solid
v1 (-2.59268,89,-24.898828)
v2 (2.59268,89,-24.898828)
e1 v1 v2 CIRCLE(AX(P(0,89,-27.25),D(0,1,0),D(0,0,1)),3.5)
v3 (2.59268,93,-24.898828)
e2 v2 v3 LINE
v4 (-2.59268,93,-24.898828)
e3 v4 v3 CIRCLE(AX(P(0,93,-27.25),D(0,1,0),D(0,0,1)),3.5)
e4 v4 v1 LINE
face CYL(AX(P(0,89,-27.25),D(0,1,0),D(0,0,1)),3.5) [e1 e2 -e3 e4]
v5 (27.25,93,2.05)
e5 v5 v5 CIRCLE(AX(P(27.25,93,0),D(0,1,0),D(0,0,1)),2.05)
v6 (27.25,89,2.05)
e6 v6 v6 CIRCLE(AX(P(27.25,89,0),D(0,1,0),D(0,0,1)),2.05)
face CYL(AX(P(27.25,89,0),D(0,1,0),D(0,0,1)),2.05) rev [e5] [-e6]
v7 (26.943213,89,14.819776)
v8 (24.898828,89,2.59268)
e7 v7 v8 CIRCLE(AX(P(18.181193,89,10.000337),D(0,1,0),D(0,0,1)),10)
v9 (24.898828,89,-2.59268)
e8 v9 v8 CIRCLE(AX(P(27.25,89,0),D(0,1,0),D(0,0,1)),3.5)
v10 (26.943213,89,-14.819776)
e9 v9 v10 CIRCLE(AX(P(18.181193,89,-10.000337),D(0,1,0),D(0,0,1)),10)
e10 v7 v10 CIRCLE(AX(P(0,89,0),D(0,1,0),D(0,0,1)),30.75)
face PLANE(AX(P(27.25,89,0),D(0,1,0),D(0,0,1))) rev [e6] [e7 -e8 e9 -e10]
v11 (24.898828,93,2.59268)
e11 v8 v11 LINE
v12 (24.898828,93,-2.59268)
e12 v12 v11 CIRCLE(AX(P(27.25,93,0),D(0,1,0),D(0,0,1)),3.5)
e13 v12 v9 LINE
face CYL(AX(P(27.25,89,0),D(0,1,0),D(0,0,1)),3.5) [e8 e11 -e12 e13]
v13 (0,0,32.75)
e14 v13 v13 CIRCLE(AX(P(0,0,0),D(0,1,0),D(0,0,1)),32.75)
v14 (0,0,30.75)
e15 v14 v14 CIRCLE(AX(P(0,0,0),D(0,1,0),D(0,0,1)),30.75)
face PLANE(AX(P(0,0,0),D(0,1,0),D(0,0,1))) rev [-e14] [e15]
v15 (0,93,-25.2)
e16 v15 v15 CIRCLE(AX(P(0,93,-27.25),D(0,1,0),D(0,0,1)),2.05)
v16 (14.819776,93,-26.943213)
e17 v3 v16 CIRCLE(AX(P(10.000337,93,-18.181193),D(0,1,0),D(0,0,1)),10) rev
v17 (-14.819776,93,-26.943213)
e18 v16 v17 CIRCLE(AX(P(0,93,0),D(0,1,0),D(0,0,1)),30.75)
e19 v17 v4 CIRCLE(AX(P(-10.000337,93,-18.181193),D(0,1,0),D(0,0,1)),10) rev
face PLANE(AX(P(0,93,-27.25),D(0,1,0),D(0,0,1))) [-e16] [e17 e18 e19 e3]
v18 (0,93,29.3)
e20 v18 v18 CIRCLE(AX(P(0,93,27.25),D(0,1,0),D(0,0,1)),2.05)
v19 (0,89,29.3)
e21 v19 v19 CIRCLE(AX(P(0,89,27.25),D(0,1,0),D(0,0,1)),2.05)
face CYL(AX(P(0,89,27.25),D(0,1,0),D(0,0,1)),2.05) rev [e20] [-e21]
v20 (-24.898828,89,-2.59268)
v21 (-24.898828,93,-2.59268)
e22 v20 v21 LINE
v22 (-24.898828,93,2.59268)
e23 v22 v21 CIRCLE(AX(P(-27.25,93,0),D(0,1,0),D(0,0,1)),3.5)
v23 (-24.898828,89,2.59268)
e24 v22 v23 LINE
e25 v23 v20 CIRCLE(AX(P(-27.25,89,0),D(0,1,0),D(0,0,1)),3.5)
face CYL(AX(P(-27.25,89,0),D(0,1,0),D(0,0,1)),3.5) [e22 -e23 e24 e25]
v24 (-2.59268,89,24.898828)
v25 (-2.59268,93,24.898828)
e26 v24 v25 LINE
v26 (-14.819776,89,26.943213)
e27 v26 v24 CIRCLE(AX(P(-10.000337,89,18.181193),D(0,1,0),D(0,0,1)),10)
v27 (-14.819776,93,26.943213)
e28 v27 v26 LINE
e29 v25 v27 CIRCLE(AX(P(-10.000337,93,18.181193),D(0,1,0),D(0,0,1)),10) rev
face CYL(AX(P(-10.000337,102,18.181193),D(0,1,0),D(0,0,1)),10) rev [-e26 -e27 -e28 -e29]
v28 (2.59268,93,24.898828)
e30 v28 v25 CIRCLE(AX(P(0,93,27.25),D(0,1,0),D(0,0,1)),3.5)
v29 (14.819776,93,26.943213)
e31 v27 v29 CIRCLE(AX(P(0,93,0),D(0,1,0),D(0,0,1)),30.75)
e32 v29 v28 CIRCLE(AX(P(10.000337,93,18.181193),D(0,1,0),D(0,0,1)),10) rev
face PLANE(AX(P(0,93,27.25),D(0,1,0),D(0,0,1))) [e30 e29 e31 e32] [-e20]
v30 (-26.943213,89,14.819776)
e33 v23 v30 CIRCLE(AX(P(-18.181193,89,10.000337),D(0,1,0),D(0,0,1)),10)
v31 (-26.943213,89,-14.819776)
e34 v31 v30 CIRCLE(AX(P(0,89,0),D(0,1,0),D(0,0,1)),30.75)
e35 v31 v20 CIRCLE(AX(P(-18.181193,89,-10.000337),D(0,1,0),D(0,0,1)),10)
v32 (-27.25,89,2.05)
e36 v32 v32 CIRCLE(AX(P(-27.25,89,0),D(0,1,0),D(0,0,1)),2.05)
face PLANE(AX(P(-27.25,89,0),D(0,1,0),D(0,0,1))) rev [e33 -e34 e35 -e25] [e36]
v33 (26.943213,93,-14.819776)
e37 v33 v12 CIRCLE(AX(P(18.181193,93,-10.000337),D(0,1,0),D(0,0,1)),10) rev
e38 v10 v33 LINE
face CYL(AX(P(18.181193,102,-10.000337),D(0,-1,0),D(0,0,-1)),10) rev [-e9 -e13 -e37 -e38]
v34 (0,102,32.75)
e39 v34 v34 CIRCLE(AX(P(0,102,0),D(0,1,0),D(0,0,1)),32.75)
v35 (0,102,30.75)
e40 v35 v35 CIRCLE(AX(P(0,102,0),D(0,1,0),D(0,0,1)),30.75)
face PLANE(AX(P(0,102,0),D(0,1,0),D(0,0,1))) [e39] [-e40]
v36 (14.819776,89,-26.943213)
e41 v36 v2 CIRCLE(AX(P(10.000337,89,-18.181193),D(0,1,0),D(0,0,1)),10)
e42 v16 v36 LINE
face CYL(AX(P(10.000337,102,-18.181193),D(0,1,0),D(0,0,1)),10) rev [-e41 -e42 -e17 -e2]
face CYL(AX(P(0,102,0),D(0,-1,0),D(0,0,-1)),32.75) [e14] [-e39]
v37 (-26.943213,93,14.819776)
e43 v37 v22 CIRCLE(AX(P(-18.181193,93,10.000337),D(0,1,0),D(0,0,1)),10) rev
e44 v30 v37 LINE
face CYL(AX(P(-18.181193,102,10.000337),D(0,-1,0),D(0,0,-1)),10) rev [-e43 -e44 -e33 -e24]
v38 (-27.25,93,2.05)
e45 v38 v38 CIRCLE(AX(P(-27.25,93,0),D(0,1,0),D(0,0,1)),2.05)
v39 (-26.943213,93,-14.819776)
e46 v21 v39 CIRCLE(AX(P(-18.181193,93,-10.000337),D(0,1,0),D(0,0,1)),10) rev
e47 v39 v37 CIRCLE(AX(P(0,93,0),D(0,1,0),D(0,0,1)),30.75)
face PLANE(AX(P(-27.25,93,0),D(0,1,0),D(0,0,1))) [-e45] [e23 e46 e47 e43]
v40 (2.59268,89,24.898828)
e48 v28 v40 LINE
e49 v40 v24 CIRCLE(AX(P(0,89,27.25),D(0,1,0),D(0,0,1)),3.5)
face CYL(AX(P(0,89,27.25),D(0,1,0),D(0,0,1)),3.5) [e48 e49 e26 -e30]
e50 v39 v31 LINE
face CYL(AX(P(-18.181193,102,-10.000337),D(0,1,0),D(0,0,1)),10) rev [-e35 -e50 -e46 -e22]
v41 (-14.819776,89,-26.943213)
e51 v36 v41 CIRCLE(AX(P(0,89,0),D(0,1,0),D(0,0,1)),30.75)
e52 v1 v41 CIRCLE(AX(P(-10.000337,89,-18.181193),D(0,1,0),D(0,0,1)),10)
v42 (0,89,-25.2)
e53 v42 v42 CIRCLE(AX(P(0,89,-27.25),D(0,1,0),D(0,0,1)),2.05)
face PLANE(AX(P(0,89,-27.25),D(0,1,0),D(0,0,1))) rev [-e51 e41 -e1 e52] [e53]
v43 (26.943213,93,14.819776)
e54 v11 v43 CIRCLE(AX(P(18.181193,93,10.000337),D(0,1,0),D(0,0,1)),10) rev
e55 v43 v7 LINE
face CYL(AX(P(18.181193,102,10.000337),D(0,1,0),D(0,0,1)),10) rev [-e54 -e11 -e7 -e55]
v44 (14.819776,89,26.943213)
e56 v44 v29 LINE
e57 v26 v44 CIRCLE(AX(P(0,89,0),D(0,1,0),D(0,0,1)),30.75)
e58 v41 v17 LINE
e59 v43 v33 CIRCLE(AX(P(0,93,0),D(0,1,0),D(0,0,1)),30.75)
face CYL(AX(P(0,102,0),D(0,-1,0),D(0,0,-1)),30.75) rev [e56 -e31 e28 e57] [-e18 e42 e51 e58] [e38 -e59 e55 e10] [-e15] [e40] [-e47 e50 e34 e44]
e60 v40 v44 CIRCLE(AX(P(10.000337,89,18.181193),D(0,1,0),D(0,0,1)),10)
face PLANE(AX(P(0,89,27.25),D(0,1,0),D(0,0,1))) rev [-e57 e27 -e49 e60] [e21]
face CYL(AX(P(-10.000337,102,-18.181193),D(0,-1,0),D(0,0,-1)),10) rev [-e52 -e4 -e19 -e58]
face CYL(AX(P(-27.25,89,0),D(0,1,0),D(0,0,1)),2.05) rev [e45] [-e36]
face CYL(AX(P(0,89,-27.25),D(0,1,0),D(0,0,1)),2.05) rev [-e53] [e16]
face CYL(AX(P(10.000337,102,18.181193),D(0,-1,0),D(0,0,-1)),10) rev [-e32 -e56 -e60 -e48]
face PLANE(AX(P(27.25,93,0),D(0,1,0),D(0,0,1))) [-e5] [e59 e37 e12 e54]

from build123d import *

# Parameters (mm, degrees)
SKETCH1_R           = 32.75
SKETCH1_R_2         = 30.75
BOSS_EXTRUDE1_DEPTH = 102
SKETCH3_R           = 2.05
BOSS_EXTRUDE2_DEPTH = 4
FILLET1_R           = 10


with BuildPart() as part:
    # Sketch1 → Boss-Extrude1 (new body)
    with BuildSketch(Plane(origin=(0, 0, 0), x_dir=(1, 0, 0), z_dir=(0, 1, 0))):
        with Locations(Location((0, 0, 0), (0, 0, 270))):
            Circle(SKETCH1_R)
        with Locations(Location((0, 0, 0), (0, 0, 270))):
            Circle(SKETCH1_R_2, mode=Mode.SUBTRACT)
    extrude(amount=BOSS_EXTRUDE1_DEPTH)

    # Sketch3 → Boss-Extrude2 (add)
    # profile 1 of 4: a face of its own
    with BuildSketch(Plane(origin=(0, 93, 0), x_dir=(1, 0, 0), z_dir=(0, 1, 0))):
        with BuildLine():
            Line((-3.5, 27.25), (-3.5, 30.801785663))
            ThreePointArc((-3.5, 30.801785663), (0, 31), (3.5, 30.801785663))
            Line((3.5, 30.801785663), (3.5, 27.25))
            ThreePointArc((3.5, 27.25), (0, 23.75), (-3.5, 27.25))
        make_face()
        with Locations(Location((0, 27.25, 0), (0, 0, 270))):
            Circle(SKETCH3_R, mode=Mode.SUBTRACT)
    # profile 2 of 4: a face of its own
    with BuildSketch(Plane(origin=(0, 93, 0), x_dir=(1, 0, 0), z_dir=(0, 1, 0))):
        with BuildLine():
            Line((27.25, -3.5), (30.801785663, -3.5))
            ThreePointArc((30.801785663, -3.5), (31, 0), (30.801785663, 3.5))
            Line((30.801785663, 3.5), (27.25, 3.5))
            ThreePointArc((27.25, 3.5), (23.75, 0), (27.25, -3.5))
        make_face()
        with Locations(Location((27.25, 0, 0), (0, 0, 270))):
            Circle(SKETCH3_R, mode=Mode.SUBTRACT)
    # profile 3 of 4: a face of its own
    with BuildSketch(Plane(origin=(0, 93, 0), x_dir=(1, 0, 0), z_dir=(0, 1, 0))):
        with BuildLine():
            Line((-3.5, -27.25), (-3.5, -30.801785663))
            ThreePointArc((-3.5, -30.801785663), (0, -31), (3.5, -30.801785663))
            Line((3.5, -30.801785663), (3.5, -27.25))
            ThreePointArc((3.5, -27.25), (0, -23.75), (-3.5, -27.25))
        make_face()
        with Locations(Location((0, -27.25, 0), (0, 0, 270))):
            Circle(SKETCH3_R, mode=Mode.SUBTRACT)
    # profile 4 of 4: a face of its own
    with BuildSketch(Plane(origin=(0, 93, 0), x_dir=(1, 0, 0), z_dir=(0, 1, 0))):
        with BuildLine():
            Line((-27.25, 3.5), (-30.801785663, 3.5))
            ThreePointArc((-30.801785663, 3.5), (-31, 0), (-30.801785663, -3.5))
            Line((-30.801785663, -3.5), (-27.25, -3.5))
            ThreePointArc((-27.25, -3.5), (-23.75, 0), (-27.25, 3.5))
        make_face()
        with Locations(Location((-27.25, 0, 0), (0, 0, 270))):
            Circle(SKETCH3_R, mode=Mode.SUBTRACT)
    extrude(amount=-BOSS_EXTRUDE2_DEPTH)

    # Fillet1
    # the kernel refuses this fillet: 10 mm, written as the material it adds along each edge
    with BuildSketch(Plane(origin=(30.550163666, 93, 3.5), x_dir=(-0.30360135292633833, 0, 0.9527991490872024), z_dir=(0, -1, 0)), Plane(origin=(-3.5, 93, 30.550163666), x_dir=(-0.9527991490872014, 0, -0.30360135292634133), z_dir=(0, -1, 0)), Plane(origin=(-30.550163666, 93, -3.5), x_dir=(0.3036013529263449, 0, -0.9527991490872003), z_dir=(0, -1, 0)), Plane(origin=(3.5, 93, -30.550163666), x_dir=(0.9527991490872035, 0, 0.30360135292633456), z_dir=(0, -1, 0))) as fillet1_piece_1:
        with BuildLine():
            CenterArc((9.948751576, 9.811634042), FILLET1_R, 204.529281699, 76.609121242)
            Line((0.851259395, 5.660051691), (-0.058489823, 5.244893456))
            ThreePointArc((-0.058489823, 5.244893456), (0.049135005, 3.447994485), (-0.952799149, 0.303601353))
            Line((-0.952799149, 0.303601353), (-0.193179642, -0.981163404))
            ThreePointArc((-0.193179642, -0.981163404), (5.940273999, -1.57922532), (12.073727641, -0.981163404))
            Line((12.073727641, -0.981163404), (11.880547998, 0))
        make_face()
    extrude(amount=4)
    with BuildSketch(Plane(origin=(30.550163666, 93, -3.5), x_dir=(-0.3036013529263308, 0, -0.9527991490872049), z_dir=(0, -1, 0)), Plane(origin=(3.5, 93, 30.550163666), x_dir=(0.9527991490872056, 0, -0.3036013529263281), z_dir=(0, -1, 0)), Plane(origin=(-30.550163666, 93, 3.5), x_dir=(0.30360135292632445, 0, 0.9527991490872069), z_dir=(0, -1, 0)), Plane(origin=(-3.5, 93, -30.550163666), x_dir=(-0.9527991490872035, 0, 0.30360135292633467), z_dir=(0, -1, 0))) as fillet1_piece_2:
        with BuildLine():
            CenterArc((9.948751576, -9.811634042), FILLET1_R, 78.861597059, 76.609121242)
            Line((0.851259395, -5.660051691), (-0.058489823, -5.244893456))
            ThreePointArc((-0.058489823, -5.244893456), (0.049135005, -3.447994485), (-0.952799149, -0.303601353))
            Line((-0.952799149, -0.303601353), (-0.193179642, 0.981163404))
            ThreePointArc((-0.193179642, 0.981163404), (5.940273999, 1.57922532), (12.073727641, 0.981163404))
            Line((12.073727641, 0.981163404), (11.880547998, 0))
        make_face()
    extrude(amount=4)


solid = part.part
